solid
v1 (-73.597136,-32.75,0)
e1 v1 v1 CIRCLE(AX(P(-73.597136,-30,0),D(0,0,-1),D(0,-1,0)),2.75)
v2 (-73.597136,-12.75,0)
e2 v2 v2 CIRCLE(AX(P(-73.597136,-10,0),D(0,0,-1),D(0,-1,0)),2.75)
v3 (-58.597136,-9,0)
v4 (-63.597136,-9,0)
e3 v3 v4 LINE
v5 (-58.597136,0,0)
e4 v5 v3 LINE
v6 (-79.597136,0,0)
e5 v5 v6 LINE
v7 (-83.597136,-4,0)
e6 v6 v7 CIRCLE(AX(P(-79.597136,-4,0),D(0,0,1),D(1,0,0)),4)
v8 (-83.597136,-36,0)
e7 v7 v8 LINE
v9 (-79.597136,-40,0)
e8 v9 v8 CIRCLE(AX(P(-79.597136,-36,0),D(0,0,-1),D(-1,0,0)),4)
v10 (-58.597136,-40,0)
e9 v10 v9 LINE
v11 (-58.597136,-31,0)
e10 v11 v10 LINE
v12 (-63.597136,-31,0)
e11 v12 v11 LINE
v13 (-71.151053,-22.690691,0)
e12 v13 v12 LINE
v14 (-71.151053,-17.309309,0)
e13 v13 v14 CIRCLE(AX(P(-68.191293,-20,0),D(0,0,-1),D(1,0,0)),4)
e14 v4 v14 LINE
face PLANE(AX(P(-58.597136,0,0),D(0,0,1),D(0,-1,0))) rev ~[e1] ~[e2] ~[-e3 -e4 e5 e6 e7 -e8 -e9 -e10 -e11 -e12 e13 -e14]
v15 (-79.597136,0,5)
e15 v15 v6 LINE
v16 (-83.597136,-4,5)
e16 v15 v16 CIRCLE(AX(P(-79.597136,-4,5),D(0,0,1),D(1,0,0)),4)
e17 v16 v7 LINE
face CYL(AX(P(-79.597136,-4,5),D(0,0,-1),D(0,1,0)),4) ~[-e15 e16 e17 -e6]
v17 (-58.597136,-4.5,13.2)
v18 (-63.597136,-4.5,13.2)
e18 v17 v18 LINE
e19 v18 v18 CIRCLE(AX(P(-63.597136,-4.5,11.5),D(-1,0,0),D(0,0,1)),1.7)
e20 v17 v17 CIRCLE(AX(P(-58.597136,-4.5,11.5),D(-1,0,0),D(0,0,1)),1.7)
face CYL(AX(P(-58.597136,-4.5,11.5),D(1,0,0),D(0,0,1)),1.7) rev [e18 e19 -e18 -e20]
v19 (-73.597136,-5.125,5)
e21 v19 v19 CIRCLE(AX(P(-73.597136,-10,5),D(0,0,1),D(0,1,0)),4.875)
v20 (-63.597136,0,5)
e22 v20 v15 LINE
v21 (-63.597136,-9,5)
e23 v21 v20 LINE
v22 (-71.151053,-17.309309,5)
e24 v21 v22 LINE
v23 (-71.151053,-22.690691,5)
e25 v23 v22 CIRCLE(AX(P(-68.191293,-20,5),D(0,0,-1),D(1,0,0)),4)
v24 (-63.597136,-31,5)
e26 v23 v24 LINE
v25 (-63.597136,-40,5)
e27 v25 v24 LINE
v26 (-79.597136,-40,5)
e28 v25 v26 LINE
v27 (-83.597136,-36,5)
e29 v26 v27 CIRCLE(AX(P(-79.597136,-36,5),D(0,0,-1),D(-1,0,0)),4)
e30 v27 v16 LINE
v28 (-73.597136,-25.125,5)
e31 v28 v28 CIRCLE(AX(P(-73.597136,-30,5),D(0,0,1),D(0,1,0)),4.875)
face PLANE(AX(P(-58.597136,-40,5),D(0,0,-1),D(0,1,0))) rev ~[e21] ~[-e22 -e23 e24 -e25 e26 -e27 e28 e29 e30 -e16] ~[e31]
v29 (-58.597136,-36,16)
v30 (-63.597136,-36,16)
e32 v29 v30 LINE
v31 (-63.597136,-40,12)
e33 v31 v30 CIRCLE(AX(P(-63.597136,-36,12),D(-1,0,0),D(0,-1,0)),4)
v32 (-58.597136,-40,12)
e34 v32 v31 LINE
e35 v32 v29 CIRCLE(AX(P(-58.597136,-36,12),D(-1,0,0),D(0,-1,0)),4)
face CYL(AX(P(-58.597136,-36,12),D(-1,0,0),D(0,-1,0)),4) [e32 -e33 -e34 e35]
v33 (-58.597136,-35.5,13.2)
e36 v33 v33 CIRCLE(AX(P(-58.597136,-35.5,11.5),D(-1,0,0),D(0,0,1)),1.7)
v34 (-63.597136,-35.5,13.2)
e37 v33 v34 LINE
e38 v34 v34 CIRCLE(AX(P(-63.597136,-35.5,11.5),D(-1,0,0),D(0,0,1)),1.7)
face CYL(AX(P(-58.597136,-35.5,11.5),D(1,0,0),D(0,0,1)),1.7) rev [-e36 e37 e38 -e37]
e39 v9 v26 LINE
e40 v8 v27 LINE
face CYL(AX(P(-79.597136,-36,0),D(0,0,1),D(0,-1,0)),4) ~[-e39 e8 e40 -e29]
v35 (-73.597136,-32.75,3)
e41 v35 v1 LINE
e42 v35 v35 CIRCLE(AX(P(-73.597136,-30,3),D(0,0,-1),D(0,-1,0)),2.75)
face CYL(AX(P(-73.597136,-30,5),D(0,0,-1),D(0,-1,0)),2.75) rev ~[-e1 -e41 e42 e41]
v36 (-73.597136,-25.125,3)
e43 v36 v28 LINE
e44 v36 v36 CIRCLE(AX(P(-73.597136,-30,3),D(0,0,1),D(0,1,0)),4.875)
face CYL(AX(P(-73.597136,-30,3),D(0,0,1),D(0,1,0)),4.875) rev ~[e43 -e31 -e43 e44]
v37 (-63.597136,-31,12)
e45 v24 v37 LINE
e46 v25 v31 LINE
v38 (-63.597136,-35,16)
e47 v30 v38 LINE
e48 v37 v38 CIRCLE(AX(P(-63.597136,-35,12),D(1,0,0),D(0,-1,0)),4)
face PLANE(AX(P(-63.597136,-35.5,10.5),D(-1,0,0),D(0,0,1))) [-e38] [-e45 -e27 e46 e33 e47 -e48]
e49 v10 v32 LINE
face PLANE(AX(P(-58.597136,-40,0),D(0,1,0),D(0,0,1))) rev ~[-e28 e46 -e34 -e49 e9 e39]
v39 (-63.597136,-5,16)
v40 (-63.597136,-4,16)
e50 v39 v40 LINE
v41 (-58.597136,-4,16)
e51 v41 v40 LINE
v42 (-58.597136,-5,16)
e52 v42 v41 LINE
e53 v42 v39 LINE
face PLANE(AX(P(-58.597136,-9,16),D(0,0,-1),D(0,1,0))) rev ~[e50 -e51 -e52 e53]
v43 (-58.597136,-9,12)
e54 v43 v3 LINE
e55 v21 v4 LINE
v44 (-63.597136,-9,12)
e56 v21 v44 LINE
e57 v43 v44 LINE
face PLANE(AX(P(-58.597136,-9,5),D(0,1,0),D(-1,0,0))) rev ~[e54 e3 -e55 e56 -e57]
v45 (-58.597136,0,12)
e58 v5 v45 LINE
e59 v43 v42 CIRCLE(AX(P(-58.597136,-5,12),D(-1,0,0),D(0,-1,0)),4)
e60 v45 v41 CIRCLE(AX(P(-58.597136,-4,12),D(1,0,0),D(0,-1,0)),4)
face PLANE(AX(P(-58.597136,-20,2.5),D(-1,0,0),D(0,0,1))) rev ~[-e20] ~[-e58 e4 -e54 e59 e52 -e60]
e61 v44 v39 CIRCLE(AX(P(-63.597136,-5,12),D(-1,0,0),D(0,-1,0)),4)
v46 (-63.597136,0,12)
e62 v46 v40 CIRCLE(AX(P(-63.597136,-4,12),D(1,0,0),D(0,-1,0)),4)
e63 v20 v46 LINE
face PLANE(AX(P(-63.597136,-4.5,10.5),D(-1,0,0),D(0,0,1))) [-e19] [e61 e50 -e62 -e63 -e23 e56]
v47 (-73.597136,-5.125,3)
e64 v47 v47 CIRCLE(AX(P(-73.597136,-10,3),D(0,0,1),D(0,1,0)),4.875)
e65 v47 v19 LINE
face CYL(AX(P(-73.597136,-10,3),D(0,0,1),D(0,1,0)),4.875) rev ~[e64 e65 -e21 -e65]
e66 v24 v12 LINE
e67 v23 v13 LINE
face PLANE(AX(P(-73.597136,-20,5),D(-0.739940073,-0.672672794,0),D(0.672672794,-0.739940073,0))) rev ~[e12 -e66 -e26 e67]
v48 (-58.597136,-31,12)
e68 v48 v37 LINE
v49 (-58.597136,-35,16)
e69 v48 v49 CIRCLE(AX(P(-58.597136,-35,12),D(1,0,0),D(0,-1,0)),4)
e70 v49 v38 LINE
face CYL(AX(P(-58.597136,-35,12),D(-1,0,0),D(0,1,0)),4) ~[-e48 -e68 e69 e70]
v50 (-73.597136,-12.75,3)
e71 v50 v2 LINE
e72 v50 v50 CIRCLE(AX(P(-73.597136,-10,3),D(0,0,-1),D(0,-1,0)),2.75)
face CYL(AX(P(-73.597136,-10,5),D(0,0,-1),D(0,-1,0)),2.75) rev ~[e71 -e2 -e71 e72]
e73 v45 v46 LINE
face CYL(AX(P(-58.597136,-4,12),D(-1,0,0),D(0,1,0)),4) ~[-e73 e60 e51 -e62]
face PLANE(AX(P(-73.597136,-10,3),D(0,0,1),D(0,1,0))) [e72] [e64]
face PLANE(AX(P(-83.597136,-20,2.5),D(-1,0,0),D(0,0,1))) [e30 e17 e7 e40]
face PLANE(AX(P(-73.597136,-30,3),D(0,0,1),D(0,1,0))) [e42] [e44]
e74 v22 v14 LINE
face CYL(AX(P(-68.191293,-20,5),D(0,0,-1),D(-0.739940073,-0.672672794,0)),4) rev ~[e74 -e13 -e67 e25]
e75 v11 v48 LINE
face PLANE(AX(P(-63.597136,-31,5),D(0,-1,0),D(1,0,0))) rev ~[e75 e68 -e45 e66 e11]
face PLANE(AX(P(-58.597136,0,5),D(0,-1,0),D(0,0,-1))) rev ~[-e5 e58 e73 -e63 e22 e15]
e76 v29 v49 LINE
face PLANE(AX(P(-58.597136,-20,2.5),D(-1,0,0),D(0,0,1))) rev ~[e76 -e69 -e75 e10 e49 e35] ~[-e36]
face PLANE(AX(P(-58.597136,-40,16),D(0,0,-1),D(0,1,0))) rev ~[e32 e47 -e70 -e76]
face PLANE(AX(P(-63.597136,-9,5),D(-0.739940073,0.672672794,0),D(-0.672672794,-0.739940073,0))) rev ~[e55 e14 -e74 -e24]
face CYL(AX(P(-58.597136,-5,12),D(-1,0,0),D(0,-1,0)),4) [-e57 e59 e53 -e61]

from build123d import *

# Parameters (mm, degrees)
F0_W           = 11
F0_H           = 9
F0_R           = 1.7
F1_DEPTH       = 5
F2_DEPTH       = 25
F4_D           = 5.5
F4_CBORE_D     = 9.75
F4_CBORE_DEPTH = 2
F5_DEPTH       = 5.001
F6_R           = 4
F7_ANGLE       = 90


# Not quite as in the source:
# - a feature names something its author has since deleted; it is built from what else it names


with BuildPart() as f1:
    # F0 (on Top) → F1 (new body)
    with BuildSketch(Plane.XY):
        with Locations((-48.0971363783, -35.5)):
            Rectangle(F0_W, F0_H)
        with Locations((-47.0971363783, -35.5)):
            Circle(F0_R, mode=Mode.SUBTRACT)
    extrude(amount=F1_DEPTH)



with BuildPart() as f1b:
    # F0 (on Top) → F1, piece 2 (new body)
    with BuildSketch(Plane.XY):
        with Locations((-48.0971363783, -4.5)):
            Rectangle(F0_W, F0_H)
        with Locations((-47.0971363783, -4.5)):
            Circle(F0_R, mode=Mode.SUBTRACT)
    extrude(amount=F1_DEPTH)


with BuildPart() as f1_1:
    add(f1.part)

    add(f1b.part)  # F2 merges F1b
    # F0 (on Top) → F2 (join)
    with BuildSketch(Plane.XY):
        Polygon((-58.5971363783, -40), (-53.5971363783, -40), (-53.5971363783, -31), (-53.5971363783, -9), (-53.5971363783, 0), (-58.5971363783, 0), align=None)
    extrude(amount=F2_DEPTH)

    # F4 (through all)
    with Locations(Plane.YZ.offset(-53.5971363783)):
        with Locations((-10, 15), (-30, 15)):
            CounterBoreHole(F4_D / 2, F4_CBORE_D / 2, F4_CBORE_DEPTH)

    # F3 (on face) → F5 (cut, through all)
    with BuildSketch(Plane.YZ.offset(-53.5971363783)):
        Polygon((-20, 15), (-31, 5), (-31, 0), (-9, 0), (-9, 5), align=None)
    extrude(amount=-F5_DEPTH, mode=Mode.SUBTRACT)

    # F6
    f6_edges = [f1_1.edges().sort_by_distance(p)[0] for p in [
        (-42.597136, 0, 2.5),
        (-42.597136, -40, 2.5),
        (-56.097136, -40, 25),
        (-56.097136, 0, 25),
        (-42.597136, -9, 2.5),
        (-42.597136, -31, 2.5),
        (-56.097136, -20, 15),
    ]]
    fillet(f6_edges, radius=F6_R)


with BuildPart() as f1_2:
    # F7: moved
    add(f1_1.part.rotate(Axis((-58.5971363783, -20, 0), (0, -1, 0)), F7_ANGLE))


solid = f1_2.part
